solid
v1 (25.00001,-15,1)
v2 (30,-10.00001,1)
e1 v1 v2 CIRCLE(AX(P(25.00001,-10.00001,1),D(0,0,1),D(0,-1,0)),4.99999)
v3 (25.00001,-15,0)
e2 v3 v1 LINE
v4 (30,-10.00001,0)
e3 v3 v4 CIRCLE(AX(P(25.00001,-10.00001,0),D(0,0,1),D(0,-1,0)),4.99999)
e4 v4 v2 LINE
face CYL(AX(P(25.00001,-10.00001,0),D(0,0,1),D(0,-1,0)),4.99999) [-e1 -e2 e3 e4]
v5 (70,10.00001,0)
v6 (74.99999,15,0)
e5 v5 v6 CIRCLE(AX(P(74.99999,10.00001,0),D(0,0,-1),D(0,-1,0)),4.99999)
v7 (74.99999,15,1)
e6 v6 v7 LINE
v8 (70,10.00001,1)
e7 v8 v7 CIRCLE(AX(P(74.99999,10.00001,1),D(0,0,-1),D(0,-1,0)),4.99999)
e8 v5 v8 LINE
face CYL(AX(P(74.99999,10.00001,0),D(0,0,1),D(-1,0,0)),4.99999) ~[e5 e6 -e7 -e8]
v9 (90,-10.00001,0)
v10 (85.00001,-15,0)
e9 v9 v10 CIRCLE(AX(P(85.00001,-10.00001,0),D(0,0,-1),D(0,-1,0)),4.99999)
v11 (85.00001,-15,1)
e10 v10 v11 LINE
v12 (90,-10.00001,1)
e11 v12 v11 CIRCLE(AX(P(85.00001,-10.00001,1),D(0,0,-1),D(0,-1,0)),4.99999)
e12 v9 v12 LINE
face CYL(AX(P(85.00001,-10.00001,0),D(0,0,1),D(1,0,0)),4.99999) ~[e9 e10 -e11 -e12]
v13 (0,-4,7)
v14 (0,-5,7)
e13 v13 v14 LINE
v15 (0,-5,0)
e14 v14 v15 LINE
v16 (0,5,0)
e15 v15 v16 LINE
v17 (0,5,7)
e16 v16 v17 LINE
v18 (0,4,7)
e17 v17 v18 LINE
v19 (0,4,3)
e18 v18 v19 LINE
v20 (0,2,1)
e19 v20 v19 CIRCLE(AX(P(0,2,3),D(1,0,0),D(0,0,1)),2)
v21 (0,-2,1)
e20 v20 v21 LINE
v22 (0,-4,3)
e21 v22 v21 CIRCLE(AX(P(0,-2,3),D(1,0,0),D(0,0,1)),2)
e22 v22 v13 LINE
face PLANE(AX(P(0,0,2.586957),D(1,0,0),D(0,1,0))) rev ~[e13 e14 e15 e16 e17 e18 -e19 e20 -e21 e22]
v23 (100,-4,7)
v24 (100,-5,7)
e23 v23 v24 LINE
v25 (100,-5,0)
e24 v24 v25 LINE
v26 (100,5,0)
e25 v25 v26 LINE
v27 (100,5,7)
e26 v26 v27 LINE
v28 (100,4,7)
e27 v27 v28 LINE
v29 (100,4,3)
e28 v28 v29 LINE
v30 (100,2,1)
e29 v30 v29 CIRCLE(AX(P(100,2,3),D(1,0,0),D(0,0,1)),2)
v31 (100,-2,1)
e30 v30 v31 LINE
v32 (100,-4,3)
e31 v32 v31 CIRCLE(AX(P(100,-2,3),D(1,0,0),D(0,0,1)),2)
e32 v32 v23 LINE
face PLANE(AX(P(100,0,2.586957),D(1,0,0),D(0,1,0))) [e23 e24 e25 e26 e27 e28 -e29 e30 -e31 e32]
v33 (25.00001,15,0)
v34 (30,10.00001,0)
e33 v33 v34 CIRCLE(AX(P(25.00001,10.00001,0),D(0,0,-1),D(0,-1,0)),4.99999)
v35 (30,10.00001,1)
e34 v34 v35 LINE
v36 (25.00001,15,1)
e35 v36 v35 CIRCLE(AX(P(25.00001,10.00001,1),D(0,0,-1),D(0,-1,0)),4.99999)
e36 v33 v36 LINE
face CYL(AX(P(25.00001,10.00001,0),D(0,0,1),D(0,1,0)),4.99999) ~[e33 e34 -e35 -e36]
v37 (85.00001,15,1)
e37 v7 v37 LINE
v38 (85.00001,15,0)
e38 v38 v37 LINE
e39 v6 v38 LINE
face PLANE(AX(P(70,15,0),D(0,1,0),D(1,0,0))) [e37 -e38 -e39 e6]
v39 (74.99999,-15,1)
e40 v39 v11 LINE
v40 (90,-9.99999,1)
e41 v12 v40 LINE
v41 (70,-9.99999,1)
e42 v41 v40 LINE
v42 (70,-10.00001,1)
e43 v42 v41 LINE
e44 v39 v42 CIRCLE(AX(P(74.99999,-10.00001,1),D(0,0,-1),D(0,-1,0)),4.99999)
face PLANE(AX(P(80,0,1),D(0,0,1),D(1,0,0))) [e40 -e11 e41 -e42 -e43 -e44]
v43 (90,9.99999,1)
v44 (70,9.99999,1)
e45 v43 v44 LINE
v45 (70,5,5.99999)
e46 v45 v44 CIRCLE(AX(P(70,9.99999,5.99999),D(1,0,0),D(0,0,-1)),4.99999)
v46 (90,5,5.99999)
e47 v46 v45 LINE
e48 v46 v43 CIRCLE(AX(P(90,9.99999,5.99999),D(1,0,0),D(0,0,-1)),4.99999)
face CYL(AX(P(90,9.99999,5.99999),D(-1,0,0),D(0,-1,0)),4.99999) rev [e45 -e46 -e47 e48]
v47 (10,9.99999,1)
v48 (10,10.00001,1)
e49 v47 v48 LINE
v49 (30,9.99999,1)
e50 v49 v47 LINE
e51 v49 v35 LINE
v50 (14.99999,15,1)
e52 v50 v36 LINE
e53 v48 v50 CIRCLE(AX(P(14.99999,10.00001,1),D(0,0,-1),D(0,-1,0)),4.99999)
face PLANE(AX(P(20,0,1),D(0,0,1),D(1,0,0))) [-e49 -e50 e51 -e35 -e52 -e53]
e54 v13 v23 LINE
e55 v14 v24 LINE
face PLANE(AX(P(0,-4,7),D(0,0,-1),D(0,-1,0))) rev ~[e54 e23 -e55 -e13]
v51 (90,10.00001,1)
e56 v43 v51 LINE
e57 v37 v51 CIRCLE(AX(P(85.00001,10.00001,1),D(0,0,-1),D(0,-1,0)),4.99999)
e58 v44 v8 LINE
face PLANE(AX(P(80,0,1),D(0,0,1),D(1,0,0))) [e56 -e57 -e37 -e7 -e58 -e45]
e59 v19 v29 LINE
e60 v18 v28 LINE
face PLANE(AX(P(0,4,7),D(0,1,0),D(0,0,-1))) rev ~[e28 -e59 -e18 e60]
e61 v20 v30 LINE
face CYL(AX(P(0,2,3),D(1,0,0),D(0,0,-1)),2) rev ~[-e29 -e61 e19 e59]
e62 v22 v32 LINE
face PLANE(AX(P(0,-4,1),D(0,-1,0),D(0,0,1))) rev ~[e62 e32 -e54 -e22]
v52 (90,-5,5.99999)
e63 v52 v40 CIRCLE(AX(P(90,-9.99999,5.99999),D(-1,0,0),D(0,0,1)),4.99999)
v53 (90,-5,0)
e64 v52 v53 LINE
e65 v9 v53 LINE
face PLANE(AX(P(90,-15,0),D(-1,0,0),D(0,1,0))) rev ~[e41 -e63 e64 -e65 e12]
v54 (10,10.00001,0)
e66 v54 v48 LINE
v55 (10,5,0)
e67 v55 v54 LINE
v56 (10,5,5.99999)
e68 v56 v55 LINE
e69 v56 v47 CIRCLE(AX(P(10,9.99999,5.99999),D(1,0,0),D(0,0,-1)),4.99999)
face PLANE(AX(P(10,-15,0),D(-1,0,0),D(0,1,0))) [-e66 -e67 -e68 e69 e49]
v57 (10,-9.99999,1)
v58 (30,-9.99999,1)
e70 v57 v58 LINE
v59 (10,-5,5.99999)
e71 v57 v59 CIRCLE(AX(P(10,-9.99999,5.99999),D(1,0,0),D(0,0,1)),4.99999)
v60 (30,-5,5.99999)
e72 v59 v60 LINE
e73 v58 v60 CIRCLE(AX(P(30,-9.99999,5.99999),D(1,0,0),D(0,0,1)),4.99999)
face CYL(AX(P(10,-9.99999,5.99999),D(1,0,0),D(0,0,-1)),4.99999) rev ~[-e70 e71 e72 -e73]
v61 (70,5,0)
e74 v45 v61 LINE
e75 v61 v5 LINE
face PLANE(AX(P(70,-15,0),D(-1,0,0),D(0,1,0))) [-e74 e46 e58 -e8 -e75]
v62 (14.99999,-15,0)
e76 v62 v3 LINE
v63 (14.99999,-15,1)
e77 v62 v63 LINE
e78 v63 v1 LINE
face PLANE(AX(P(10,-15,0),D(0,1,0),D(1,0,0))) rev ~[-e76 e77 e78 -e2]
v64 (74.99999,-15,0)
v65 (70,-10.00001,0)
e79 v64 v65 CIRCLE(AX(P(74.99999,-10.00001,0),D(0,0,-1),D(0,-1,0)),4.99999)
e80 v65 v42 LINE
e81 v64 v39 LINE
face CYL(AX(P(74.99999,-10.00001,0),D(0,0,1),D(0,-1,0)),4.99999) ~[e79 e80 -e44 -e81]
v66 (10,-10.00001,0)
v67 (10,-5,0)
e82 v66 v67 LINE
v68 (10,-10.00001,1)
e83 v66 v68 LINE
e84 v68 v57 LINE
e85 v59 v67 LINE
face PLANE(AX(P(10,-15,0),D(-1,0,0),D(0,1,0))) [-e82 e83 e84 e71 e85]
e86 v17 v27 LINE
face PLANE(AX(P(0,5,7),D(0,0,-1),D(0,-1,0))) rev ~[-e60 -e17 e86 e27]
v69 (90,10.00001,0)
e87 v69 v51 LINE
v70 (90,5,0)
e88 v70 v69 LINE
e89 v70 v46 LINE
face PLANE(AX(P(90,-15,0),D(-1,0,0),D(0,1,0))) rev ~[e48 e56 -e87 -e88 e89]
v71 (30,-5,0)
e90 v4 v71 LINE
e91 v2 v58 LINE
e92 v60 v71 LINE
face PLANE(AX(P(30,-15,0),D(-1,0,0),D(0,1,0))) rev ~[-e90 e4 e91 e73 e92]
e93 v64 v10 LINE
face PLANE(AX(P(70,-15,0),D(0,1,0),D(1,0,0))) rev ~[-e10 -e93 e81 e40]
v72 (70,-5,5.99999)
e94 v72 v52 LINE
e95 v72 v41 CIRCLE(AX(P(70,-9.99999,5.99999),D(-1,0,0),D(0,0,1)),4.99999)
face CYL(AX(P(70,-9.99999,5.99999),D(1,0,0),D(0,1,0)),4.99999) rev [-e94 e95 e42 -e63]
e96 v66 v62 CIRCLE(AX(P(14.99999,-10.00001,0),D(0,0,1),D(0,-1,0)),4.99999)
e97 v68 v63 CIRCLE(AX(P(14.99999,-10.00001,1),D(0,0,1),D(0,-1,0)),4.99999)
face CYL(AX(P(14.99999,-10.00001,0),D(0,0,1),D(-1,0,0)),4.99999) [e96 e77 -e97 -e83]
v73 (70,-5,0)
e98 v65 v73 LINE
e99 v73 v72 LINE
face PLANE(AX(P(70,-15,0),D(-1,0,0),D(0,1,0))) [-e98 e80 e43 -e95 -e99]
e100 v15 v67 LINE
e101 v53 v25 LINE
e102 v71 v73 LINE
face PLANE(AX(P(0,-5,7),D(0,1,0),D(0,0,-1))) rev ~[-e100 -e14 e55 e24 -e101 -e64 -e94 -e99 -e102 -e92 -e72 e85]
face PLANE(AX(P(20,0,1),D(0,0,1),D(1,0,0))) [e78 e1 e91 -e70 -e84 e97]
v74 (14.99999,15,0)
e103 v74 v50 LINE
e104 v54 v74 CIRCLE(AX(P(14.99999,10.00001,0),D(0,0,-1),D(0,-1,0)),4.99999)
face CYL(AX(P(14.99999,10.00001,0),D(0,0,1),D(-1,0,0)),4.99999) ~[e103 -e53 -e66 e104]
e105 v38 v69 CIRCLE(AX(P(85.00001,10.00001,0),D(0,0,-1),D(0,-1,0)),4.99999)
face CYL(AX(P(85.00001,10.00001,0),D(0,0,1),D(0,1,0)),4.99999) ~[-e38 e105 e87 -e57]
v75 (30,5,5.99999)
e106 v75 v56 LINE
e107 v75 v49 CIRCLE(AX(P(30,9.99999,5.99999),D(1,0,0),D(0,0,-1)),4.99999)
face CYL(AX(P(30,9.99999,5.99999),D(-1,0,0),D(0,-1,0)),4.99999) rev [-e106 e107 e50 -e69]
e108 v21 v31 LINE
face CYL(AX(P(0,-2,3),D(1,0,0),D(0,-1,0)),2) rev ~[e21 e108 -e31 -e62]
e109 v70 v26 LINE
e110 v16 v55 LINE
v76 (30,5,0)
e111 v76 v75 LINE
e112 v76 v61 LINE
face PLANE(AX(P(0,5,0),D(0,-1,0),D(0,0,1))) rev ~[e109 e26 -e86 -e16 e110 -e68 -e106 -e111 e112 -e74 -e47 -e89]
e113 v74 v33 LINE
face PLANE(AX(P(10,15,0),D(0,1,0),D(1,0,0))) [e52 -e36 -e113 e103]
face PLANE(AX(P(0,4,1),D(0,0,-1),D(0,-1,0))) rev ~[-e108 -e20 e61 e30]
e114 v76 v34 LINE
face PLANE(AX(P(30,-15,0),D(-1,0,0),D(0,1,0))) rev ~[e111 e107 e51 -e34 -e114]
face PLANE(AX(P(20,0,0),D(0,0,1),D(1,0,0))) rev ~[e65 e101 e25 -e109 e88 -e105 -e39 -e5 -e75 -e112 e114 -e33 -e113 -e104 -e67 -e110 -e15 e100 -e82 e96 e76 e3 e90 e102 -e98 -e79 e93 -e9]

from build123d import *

# Parameters (mm, degrees)
F1_DEPTH = 100
F2_W     = 20
F2_H     = 30
F3_DEPTH = 1
F4_R     = 4.99999
F5_R     = 2


# Not quite as in the source:
# - a fillet or chamfer is up to 0.001 mm smaller than in the source, because OpenCascade refuses the exact size


with BuildPart() as f1:
    # F0 (on Right) → F1 (new body)
    with BuildSketch(Plane.YZ):
        Polygon((-4, 7), (-5, 7), (-5, 0), (5, 0), (5, 7), (4, 7), (4, 1), (-4, 1), align=None)
    extrude(amount=F1_DEPTH)

    # F2 (on Top) → F3 (join)
    with BuildSketch(Plane.XY):
        with Locations((20, 0)):
            Rectangle(F2_W, F2_H)
        with Locations((80, 0)):
            Rectangle(F2_W, F2_H)
    extrude(amount=F3_DEPTH)

    # F4 (radius 5 in the source; OpenCascade refuses exactly that, so slightly less here)
    f4_edges = [f1.edges().sort_by_distance(p)[0] for p in [
        (20, -5, 1),
        (80, -5, 1),
        (20, 5, 1),
        (80, 5, 1),
        (10, -15, 0.5),
        (30, -15, 0.5),
        (70, -15, 0.5),
        (90, -15, 0.5),
        (10, 15, 0.5),
        (30, 15, 0.5),
        (70, 15, 0.5),
        (90, 15, 0.5),
    ]]
    fillet(f4_edges, radius=F4_R)

    # F5
    f5_edges = [f1.edges().sort_by_distance(p)[0] for p in [
        (50, 4, 1),
        (50, -4, 1),
    ]]
    fillet(f5_edges, radius=F5_R)


solid = f1.part
